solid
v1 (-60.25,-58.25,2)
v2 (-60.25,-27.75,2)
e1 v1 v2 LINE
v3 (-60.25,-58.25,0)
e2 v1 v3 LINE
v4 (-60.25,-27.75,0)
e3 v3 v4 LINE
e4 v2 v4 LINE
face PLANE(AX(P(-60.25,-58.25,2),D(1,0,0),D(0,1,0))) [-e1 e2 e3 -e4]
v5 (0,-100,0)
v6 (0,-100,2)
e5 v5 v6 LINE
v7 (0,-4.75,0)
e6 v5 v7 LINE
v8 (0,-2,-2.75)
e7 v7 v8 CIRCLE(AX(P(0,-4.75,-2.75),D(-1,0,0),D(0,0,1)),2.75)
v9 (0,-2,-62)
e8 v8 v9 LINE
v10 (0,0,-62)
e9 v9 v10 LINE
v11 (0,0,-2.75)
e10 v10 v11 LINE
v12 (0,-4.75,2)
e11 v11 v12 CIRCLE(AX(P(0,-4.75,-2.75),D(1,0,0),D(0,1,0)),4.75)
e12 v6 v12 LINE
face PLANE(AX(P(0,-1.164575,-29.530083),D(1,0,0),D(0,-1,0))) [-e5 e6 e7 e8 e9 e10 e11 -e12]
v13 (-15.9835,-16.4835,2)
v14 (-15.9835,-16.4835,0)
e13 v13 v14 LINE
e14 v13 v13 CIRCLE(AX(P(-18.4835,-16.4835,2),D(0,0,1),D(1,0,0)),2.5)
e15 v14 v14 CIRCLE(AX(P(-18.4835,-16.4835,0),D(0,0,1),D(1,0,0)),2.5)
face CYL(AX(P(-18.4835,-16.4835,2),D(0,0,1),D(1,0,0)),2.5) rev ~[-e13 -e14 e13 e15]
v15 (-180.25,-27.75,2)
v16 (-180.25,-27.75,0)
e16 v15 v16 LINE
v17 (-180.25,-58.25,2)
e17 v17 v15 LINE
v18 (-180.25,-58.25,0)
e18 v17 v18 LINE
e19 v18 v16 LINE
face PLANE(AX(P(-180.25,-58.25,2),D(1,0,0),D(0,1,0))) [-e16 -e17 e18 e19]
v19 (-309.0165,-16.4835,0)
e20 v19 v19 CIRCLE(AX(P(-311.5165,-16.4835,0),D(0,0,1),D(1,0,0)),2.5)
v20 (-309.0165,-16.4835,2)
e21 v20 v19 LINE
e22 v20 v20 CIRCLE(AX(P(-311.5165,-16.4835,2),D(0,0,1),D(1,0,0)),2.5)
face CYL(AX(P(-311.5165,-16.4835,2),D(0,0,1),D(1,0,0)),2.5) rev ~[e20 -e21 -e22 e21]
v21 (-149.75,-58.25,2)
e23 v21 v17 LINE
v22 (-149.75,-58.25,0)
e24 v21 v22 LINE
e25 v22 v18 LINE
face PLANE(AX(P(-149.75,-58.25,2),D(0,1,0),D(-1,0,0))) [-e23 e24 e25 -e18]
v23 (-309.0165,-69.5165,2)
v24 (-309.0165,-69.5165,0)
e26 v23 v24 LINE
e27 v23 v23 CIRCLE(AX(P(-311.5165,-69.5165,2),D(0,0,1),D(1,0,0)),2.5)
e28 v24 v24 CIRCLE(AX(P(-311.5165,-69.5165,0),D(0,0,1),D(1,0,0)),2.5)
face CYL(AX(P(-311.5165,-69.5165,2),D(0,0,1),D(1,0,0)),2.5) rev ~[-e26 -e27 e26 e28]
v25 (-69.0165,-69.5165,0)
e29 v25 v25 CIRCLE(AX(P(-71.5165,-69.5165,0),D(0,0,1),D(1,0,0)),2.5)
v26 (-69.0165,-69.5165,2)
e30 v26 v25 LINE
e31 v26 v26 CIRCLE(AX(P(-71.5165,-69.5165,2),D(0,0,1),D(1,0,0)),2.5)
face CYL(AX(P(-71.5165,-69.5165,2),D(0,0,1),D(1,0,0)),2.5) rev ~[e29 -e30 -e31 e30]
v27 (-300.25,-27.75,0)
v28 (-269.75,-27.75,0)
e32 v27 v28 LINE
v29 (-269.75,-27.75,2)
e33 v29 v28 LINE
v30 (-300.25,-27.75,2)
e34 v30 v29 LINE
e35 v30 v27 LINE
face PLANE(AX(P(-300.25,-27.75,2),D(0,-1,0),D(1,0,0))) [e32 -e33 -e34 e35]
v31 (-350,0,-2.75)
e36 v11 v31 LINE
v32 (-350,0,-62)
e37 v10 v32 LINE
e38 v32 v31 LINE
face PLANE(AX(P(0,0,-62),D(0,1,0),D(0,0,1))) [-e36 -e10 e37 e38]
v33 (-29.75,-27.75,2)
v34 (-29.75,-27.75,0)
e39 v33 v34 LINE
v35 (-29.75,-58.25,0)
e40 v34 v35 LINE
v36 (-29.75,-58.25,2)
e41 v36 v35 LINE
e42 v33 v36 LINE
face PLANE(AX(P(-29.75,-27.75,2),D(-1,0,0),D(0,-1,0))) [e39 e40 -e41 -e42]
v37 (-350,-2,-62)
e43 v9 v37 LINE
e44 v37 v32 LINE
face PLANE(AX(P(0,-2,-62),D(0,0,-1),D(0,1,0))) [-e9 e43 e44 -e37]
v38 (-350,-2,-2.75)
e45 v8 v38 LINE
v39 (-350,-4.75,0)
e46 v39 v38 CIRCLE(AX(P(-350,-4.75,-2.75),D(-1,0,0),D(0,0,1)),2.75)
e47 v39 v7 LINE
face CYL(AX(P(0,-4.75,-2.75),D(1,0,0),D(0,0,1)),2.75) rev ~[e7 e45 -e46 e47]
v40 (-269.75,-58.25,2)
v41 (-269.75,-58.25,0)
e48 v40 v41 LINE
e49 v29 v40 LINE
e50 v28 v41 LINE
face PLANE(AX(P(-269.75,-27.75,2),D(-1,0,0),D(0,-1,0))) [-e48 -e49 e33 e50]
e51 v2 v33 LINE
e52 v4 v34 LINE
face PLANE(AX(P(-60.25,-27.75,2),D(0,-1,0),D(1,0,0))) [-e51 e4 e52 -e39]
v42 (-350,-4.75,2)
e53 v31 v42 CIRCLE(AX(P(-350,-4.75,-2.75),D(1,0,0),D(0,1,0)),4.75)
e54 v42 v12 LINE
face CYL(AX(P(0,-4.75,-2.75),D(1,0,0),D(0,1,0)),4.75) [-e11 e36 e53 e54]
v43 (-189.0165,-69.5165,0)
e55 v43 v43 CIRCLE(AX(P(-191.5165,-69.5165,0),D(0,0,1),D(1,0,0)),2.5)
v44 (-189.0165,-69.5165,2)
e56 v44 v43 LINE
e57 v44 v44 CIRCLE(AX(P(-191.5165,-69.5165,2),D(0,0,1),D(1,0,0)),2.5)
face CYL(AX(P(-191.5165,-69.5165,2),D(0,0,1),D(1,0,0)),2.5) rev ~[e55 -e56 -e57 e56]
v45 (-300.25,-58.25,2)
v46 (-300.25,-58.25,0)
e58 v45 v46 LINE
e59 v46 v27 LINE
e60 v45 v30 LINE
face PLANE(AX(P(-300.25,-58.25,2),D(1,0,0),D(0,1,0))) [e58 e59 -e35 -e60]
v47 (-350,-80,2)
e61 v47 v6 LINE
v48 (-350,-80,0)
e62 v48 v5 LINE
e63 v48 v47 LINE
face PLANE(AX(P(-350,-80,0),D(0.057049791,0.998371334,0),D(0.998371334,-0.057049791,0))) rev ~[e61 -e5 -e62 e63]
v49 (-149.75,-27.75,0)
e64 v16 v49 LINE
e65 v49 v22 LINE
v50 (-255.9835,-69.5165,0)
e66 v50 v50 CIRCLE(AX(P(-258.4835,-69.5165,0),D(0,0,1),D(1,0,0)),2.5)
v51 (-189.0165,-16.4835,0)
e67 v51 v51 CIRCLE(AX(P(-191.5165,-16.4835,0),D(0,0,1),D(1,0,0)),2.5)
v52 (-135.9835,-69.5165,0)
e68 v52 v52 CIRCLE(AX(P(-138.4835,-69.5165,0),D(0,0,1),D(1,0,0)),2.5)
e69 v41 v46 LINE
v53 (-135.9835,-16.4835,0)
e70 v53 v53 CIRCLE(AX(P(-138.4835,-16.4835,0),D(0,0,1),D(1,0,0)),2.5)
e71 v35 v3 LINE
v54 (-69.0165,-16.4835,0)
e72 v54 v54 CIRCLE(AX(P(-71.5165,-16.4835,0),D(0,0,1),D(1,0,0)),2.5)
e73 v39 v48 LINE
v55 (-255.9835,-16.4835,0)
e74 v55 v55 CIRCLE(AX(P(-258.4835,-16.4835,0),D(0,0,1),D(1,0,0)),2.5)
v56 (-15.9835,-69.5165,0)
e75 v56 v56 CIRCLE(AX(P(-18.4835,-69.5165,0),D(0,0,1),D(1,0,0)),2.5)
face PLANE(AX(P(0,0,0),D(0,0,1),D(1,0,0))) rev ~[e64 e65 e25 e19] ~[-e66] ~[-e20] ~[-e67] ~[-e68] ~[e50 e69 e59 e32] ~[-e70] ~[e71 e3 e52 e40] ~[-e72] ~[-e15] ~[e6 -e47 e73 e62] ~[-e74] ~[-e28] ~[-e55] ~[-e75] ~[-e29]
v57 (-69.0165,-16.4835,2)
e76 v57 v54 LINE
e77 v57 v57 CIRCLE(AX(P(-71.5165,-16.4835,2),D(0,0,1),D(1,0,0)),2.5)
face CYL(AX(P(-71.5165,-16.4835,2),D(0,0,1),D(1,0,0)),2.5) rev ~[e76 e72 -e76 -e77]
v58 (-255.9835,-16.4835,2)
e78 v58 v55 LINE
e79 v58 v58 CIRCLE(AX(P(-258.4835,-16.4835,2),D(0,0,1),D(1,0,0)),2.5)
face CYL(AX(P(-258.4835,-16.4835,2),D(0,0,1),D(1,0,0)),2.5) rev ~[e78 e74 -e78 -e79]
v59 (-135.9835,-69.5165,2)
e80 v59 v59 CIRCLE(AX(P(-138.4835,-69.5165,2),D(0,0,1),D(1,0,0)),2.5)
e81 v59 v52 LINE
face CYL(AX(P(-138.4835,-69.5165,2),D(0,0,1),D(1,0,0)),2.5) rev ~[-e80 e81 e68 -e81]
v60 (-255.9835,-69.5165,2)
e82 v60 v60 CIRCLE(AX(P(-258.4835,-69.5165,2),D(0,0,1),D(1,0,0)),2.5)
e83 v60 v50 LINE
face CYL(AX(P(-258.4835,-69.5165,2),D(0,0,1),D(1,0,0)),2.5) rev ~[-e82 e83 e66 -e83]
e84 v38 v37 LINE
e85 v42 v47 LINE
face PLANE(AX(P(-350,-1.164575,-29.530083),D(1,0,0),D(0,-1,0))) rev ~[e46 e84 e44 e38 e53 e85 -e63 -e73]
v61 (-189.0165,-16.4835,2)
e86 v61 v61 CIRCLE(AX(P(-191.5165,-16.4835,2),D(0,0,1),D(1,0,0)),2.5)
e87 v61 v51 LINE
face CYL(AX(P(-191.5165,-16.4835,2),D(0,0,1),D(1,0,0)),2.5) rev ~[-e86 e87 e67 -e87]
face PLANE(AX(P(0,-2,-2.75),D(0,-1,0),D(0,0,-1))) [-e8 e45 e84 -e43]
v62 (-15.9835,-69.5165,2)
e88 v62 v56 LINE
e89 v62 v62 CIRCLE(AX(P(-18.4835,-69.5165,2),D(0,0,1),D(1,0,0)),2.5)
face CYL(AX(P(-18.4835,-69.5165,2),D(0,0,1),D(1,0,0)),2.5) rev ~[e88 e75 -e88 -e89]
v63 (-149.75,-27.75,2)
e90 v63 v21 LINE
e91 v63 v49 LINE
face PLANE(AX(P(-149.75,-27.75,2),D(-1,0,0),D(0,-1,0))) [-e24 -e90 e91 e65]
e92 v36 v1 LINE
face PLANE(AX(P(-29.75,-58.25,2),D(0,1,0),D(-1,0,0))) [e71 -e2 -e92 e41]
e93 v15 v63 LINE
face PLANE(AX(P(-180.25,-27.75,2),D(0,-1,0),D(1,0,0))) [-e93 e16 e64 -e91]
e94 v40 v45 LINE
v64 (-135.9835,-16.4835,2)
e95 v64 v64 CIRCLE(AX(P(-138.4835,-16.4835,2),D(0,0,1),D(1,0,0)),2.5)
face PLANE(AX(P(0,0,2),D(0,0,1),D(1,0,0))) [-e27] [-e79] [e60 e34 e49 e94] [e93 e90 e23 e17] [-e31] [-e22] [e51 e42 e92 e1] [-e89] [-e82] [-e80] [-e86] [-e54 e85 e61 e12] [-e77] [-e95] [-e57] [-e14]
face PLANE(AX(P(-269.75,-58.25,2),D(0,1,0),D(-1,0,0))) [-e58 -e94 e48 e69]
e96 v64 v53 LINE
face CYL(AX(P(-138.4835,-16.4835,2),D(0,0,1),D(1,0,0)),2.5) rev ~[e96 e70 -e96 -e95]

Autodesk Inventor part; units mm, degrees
ref_plane "YZ Plane" through (0, 0, 0) normal (1, 0, 0) x (0, 1, 0)
ref_plane "XZ Plane" through (0, 0, 0) normal (0, 1, 0) x (-1, 0, 0)
ref_plane "XY Plane" through (0, 0, 0) normal (0, 0, 1) x (1, 0, 0)
sketch "Sketch1" plane through (0, 0, 0) normal (0, 0, 1) x (1, 0, 0)
  line L0 (0, 0) -> (-350, 0)
  line L1 (0, -100) -> (0, 0)
  line L2 (-350, 0) -> (-350, -80)
  line L3 (-350, -80) -> (0, -100)
  point P0 (0, -50)
  dimension "d32" = 100
  dimension "d60" = 80
  dimension "d61" = 350
extrude "Plate1" add sketch "Sketch1" along normal blind 2
sketch "Sketch8" plane through (0, 0, 2) normal (0, 0, 1) x (1, 0, 0)
  line L0 (-29.75, -58.25) -> (-60.25, -58.25)
  line L1 (-60.25, -58.25) -> (-60.25, -27.75)
  line L2 (-60.25, -27.75) -> (-29.75, -27.75)
  line L3 (-29.75, -27.75) -> (-29.75, -58.25)
  line L4 (-29.75, -58.25) -> (-60.25, -27.75) construction
  line L5 (-60.25, -58.25) -> (-29.75, -27.75) construction
  circle A0 centre (-18.4835, -69.5165) radius 2.5
  circle A1 centre (-71.5165, -69.5165) radius 2.5
  circle A2 centre (-71.5165, -16.4835) radius 2.5
  circle A3 centre (-18.4835, -16.4835) radius 2.5
  circle A4 centre (-45, -43) radius 37.5 construction
  line L6 (0, 0) -> (0, -100) projected
  line L7 (-350, 0) -> (0, 0) projected
  line L8 (-60.25, -58.25) -> (-71.5165, -69.5165) construction
  dimension "d51" = 30.5
  dimension "d52" = 30.5
  dimension "d53" = 5
  dimension "d72" = 45
  dimension "d73" = 43
  dimension "d74" = 15.9332
  dimension "d75" = 75
extrude "Cut3" cut sketch "Sketch8" against normal blind 2
pattern_linear "Rectangular Pattern1" count 3 spacing 120 along (-1, 0, 0) of "Cut3"
sketch "Sketch9" plane through (0, -2, 2) normal (0, 1, 0) x (-1, 0, 0)
  line L0 (350, 0) -> (0, 0)
  line L1 (0, 0) -> (0, -64)
  line L2 (0, -64) -> (350, -64)
  line L3 (350, -64) -> (350, 0)
edge flange "Flange3" height 64 angle 90 thickness 2 bend radius 2.75 thickness toward (0, 1, 0) relief round relief width 2 relief depth 1 edges at (-175, 0, 0) wall of the first edge with corners at (-350, -2, 2) (0, -2, 2) (0, -2, -62) (-350, -2, -62)
bend "Bend3"
corner "Corner3"
equation "\"d32\" = Main_way_hight"
equation "\"d51\" = d52"
equation "\"d55\" = Thickness"
equation "\"d2\" = Thickness"
equation "\"d62\" = BendReliefWidth"
equation "\"d63\" = BendReliefDepth"
equation "\"d64\" = MinimumRemnant"
equation "\"d65\" = TransitionRadius"
equation "\"d66\" = MAIN_7_central_window_width + 2 * Thickness"
equation "\"d68\" = BendRadius"
equation "\"d69\" = CornerReliefSize"
equation "\"d70\" = GapSize"
equation "\"d71\" = JacobiRadiusSize"
equation "\"BendReliefWidth\" = Thickness"
equation "\"BendReliefDepth\" = 0.5 * Thickness"
equation "\"CornerReliefSize\" = 4 * Thickness"
equation "\"MinimumRemnant\" = 2 * Thickness"
equation "\"TransitionRadius\" = BendRadius"
equation "\"JacobiRadiusSize\" = BendRadius"
equation "\"GapSize\" = Thickness"
equation "\"Main_way_hight\" = 100"
equation "\"Thickness\" = 2"
equation "\"MAIN_7_central_window_width\" = 60"
equation "\"BendRadius\" = 2.75"
properties part number "SLM 1422 BOTTOM FDS diameter way up" material "Stainless Steel"
